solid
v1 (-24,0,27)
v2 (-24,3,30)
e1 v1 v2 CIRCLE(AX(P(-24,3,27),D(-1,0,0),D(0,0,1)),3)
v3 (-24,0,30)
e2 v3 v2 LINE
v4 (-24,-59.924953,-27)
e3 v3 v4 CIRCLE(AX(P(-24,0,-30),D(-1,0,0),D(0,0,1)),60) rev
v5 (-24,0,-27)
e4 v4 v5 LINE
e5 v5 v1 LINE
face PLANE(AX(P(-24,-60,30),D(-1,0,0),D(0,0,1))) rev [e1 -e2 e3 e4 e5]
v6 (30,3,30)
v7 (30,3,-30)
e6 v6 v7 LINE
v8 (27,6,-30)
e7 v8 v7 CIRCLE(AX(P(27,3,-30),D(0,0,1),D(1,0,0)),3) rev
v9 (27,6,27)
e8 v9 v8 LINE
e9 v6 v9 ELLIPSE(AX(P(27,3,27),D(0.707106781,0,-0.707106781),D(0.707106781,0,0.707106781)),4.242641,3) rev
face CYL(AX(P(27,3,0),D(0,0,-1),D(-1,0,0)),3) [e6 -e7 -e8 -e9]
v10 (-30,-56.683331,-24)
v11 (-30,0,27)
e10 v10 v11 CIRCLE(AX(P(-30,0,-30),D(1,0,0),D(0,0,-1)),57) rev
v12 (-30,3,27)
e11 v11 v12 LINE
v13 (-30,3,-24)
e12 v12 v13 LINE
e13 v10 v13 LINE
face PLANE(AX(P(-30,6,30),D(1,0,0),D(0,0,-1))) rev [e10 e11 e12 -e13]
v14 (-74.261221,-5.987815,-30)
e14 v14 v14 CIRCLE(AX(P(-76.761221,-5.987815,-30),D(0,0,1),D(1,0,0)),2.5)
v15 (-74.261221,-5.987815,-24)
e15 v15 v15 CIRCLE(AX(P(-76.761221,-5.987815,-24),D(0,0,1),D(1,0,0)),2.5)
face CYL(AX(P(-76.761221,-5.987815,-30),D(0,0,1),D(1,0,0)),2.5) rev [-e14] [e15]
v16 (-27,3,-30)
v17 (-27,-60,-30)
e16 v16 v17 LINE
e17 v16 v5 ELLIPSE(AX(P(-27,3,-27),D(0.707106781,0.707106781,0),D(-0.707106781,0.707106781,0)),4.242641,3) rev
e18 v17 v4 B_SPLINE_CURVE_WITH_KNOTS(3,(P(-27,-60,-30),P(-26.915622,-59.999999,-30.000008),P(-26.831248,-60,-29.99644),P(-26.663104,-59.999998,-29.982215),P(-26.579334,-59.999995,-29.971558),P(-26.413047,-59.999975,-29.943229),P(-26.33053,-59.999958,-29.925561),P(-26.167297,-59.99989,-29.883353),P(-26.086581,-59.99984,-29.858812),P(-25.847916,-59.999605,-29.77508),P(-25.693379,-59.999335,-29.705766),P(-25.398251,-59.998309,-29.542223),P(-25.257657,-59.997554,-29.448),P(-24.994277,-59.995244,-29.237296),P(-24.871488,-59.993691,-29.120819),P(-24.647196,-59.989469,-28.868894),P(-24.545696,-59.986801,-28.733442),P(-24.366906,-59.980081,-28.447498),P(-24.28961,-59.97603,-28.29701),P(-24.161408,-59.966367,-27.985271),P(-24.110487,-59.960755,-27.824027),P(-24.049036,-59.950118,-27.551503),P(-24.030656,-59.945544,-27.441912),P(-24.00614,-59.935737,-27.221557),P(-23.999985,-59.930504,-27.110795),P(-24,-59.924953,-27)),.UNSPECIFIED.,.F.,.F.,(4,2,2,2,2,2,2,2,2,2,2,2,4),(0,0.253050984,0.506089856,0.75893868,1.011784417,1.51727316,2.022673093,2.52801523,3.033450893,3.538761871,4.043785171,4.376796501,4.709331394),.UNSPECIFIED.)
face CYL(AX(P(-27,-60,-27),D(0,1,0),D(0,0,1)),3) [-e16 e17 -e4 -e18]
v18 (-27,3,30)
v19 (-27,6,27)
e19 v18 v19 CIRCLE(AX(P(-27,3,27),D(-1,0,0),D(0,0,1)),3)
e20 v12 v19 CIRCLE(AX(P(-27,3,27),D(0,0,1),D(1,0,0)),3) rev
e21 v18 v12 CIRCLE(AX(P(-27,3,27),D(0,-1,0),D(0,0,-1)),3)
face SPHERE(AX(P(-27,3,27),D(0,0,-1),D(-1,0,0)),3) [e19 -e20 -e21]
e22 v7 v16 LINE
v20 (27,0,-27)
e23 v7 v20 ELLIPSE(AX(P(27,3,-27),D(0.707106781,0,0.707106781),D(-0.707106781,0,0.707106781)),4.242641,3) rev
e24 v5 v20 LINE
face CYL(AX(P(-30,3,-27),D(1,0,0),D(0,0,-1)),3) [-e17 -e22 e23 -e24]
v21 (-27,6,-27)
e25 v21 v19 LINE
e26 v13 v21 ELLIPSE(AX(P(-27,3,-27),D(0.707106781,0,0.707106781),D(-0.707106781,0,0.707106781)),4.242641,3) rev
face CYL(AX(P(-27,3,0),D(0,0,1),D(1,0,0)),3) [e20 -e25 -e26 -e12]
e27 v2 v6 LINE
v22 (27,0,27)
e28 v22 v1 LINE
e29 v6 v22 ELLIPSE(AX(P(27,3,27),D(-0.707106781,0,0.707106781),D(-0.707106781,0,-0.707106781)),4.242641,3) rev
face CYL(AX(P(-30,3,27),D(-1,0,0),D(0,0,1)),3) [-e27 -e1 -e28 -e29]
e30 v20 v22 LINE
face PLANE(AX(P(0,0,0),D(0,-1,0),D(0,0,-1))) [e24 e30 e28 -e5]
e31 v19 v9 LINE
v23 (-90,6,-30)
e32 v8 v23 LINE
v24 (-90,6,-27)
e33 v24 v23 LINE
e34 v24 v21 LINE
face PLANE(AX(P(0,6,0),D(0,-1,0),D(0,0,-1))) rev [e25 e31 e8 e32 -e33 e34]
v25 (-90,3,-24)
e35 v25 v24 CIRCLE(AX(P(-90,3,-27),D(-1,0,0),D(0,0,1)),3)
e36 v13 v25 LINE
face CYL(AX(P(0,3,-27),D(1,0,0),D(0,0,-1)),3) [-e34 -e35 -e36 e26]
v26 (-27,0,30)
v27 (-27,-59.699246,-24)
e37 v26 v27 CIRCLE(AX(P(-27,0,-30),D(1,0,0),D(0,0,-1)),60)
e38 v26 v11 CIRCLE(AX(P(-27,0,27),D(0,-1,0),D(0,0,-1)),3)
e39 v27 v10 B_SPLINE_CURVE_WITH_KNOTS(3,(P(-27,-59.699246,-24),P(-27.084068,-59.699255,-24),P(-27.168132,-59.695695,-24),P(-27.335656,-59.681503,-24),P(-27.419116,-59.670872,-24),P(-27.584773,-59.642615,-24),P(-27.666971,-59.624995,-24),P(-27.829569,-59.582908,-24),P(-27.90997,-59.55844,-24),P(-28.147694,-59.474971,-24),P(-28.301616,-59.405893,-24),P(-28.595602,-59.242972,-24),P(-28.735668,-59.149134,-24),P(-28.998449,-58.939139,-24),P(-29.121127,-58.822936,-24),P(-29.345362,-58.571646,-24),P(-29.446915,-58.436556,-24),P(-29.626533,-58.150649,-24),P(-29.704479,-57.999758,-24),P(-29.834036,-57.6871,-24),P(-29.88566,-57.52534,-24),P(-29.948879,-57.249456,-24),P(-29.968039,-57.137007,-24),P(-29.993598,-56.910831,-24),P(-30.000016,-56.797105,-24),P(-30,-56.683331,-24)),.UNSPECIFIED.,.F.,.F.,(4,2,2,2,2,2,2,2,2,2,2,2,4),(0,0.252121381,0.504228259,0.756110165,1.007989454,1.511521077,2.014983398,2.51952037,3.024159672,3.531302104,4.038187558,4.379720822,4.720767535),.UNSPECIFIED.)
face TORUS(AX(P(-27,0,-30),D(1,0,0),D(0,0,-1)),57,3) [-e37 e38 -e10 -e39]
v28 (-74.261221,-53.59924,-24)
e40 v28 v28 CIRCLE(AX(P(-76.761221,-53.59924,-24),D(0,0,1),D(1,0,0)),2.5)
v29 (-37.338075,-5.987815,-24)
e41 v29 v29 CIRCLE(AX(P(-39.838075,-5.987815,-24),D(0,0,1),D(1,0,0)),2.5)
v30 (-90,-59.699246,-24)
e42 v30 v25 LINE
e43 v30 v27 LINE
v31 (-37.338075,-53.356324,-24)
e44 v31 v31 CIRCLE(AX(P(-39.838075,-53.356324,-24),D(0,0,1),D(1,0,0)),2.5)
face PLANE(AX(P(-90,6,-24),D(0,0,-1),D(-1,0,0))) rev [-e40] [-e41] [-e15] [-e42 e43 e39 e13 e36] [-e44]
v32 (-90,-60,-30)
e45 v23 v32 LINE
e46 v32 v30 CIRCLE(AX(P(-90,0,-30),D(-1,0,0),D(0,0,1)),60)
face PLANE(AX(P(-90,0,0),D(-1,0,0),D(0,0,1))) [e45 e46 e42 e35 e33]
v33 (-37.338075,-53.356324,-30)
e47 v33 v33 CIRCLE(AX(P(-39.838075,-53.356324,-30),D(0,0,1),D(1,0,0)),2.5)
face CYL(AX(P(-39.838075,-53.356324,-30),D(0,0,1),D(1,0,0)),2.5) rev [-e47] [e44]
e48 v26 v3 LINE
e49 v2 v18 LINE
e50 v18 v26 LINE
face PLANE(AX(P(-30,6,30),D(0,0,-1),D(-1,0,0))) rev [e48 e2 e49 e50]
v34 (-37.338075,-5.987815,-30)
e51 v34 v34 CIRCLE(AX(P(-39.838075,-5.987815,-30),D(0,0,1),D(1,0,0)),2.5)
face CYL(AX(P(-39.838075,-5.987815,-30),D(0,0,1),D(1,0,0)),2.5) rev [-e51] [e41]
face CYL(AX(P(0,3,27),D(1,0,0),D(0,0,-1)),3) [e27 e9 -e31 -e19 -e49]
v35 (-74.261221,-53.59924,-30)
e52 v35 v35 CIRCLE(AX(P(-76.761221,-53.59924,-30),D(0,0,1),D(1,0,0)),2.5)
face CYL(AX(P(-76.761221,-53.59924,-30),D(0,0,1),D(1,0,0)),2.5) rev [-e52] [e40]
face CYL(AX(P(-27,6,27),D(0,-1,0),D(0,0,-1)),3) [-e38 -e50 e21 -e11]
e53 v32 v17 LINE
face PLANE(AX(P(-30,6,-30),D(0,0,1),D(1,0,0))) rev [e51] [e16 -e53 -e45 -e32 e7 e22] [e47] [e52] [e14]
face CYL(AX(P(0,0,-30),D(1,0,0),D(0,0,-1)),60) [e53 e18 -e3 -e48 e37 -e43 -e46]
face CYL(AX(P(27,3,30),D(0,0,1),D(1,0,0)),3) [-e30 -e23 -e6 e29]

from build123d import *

# Parameters (mm, degrees)
SKETCH_1_W          = 60
SKETCH_1_H          = 60
EXTRUDE_312_DEPTH   = 6
SKETCH_2_W          = 6
SKETCH_2_H          = 60
EXTRUDE_2_DEPTH     = 60
SKETCH_3_W          = 6
SKETCH_3_H          = 66
EXTRUDE_708_DEPTH   = 60
FILLET_1_R          = 60
SKETCH_4_R          = 2.5
CUT_EXTRUDE_1_DEPTH = 6
FILLET_2_R          = 3
FILLET_3_R          = 3
FILLET_4_R          = 3
FILLET_7_R          = 3


with BuildPart() as part:
    # Эскиз1 → Extrude 312 (new body)
    with BuildSketch(Plane(origin=(0, 0, 0), x_dir=(1, 0, 0), z_dir=(0, 1, 0))):
        Rectangle(SKETCH_1_W, SKETCH_1_H)
    extrude(amount=EXTRUDE_312_DEPTH)

    # Эскиз2 → Бобышка-Вытянуть2 (add)
    with BuildSketch(Plane.XZ):
        with Locations((-27, 0)):
            Rectangle(SKETCH_2_W, SKETCH_2_H)
    extrude(amount=EXTRUDE_2_DEPTH)

    # Эскиз3 → Extrude 708 (add)
    with BuildSketch(Plane.ZY.offset(30)):
        with Locations((-27, -27)):
            Rectangle(SKETCH_3_W, SKETCH_3_H)
    extrude(amount=EXTRUDE_708_DEPTH)

    # Скругление1
    fillet_1_edges = [part.edges().sort_by_distance(p)[0] for p in [
        (-27, -60, 30),
    ]]
    fillet(fillet_1_edges, radius=FILLET_1_R - 0.0001)  # a hair under: the kernel refuses the full size

    # Эскиз4 → Вырез-Вытянуть1 (cut)
    with BuildSketch(Plane.XY.offset(-24)):
        with Locations((-76.761220605, -5.987815157)):
            Circle(SKETCH_4_R)
        with Locations((-39.838074985, -5.987815157)):
            Circle(SKETCH_4_R)
        with Locations((-76.761220605, -53.599239773)):
            Circle(SKETCH_4_R)
        with Locations((-39.838074985, -53.356324341)):
            Circle(SKETCH_4_R)
    extrude(amount=-CUT_EXTRUDE_1_DEPTH, mode=Mode.SUBTRACT)

    # Скругление2
    fillet_2_edges = [part.edges().sort_by_distance(p)[0] for p in [
        (-60, 6, -24),
    ]]
    fillet(fillet_2_edges, radius=FILLET_2_R)

    # Скругление3
    fillet_3_edges = [part.edges().sort_by_distance(p)[0] for p in [
        (3, 0, 30),
        (-24, -30, -30),
        (3, 0, -30),
        (30, 0, 0),
    ]]
    fillet(fillet_3_edges, radius=FILLET_3_R)

    # Скругление4
    fillet_4_edges = [part.edges().sort_by_distance(p)[0] for p in [
        (-30, 6, 1.5),
    ]]
    fillet(fillet_4_edges, radius=FILLET_4_R)

    # Скругление7
    fillet_7_edges = [part.edges().sort_by_distance(p)[0] for p in [
        (-30, -40.249290054, 14.497186422),
        (-30, 1.49995, 30),
        (-29.121320344, 5.121320344, 30),
        (30, 6, 0),
        (1.5, 6, 30),
    ]]
    fillet(fillet_7_edges, radius=FILLET_7_R - 0.0001)  # a hair under: the kernel refuses the full size


solid = part.part
